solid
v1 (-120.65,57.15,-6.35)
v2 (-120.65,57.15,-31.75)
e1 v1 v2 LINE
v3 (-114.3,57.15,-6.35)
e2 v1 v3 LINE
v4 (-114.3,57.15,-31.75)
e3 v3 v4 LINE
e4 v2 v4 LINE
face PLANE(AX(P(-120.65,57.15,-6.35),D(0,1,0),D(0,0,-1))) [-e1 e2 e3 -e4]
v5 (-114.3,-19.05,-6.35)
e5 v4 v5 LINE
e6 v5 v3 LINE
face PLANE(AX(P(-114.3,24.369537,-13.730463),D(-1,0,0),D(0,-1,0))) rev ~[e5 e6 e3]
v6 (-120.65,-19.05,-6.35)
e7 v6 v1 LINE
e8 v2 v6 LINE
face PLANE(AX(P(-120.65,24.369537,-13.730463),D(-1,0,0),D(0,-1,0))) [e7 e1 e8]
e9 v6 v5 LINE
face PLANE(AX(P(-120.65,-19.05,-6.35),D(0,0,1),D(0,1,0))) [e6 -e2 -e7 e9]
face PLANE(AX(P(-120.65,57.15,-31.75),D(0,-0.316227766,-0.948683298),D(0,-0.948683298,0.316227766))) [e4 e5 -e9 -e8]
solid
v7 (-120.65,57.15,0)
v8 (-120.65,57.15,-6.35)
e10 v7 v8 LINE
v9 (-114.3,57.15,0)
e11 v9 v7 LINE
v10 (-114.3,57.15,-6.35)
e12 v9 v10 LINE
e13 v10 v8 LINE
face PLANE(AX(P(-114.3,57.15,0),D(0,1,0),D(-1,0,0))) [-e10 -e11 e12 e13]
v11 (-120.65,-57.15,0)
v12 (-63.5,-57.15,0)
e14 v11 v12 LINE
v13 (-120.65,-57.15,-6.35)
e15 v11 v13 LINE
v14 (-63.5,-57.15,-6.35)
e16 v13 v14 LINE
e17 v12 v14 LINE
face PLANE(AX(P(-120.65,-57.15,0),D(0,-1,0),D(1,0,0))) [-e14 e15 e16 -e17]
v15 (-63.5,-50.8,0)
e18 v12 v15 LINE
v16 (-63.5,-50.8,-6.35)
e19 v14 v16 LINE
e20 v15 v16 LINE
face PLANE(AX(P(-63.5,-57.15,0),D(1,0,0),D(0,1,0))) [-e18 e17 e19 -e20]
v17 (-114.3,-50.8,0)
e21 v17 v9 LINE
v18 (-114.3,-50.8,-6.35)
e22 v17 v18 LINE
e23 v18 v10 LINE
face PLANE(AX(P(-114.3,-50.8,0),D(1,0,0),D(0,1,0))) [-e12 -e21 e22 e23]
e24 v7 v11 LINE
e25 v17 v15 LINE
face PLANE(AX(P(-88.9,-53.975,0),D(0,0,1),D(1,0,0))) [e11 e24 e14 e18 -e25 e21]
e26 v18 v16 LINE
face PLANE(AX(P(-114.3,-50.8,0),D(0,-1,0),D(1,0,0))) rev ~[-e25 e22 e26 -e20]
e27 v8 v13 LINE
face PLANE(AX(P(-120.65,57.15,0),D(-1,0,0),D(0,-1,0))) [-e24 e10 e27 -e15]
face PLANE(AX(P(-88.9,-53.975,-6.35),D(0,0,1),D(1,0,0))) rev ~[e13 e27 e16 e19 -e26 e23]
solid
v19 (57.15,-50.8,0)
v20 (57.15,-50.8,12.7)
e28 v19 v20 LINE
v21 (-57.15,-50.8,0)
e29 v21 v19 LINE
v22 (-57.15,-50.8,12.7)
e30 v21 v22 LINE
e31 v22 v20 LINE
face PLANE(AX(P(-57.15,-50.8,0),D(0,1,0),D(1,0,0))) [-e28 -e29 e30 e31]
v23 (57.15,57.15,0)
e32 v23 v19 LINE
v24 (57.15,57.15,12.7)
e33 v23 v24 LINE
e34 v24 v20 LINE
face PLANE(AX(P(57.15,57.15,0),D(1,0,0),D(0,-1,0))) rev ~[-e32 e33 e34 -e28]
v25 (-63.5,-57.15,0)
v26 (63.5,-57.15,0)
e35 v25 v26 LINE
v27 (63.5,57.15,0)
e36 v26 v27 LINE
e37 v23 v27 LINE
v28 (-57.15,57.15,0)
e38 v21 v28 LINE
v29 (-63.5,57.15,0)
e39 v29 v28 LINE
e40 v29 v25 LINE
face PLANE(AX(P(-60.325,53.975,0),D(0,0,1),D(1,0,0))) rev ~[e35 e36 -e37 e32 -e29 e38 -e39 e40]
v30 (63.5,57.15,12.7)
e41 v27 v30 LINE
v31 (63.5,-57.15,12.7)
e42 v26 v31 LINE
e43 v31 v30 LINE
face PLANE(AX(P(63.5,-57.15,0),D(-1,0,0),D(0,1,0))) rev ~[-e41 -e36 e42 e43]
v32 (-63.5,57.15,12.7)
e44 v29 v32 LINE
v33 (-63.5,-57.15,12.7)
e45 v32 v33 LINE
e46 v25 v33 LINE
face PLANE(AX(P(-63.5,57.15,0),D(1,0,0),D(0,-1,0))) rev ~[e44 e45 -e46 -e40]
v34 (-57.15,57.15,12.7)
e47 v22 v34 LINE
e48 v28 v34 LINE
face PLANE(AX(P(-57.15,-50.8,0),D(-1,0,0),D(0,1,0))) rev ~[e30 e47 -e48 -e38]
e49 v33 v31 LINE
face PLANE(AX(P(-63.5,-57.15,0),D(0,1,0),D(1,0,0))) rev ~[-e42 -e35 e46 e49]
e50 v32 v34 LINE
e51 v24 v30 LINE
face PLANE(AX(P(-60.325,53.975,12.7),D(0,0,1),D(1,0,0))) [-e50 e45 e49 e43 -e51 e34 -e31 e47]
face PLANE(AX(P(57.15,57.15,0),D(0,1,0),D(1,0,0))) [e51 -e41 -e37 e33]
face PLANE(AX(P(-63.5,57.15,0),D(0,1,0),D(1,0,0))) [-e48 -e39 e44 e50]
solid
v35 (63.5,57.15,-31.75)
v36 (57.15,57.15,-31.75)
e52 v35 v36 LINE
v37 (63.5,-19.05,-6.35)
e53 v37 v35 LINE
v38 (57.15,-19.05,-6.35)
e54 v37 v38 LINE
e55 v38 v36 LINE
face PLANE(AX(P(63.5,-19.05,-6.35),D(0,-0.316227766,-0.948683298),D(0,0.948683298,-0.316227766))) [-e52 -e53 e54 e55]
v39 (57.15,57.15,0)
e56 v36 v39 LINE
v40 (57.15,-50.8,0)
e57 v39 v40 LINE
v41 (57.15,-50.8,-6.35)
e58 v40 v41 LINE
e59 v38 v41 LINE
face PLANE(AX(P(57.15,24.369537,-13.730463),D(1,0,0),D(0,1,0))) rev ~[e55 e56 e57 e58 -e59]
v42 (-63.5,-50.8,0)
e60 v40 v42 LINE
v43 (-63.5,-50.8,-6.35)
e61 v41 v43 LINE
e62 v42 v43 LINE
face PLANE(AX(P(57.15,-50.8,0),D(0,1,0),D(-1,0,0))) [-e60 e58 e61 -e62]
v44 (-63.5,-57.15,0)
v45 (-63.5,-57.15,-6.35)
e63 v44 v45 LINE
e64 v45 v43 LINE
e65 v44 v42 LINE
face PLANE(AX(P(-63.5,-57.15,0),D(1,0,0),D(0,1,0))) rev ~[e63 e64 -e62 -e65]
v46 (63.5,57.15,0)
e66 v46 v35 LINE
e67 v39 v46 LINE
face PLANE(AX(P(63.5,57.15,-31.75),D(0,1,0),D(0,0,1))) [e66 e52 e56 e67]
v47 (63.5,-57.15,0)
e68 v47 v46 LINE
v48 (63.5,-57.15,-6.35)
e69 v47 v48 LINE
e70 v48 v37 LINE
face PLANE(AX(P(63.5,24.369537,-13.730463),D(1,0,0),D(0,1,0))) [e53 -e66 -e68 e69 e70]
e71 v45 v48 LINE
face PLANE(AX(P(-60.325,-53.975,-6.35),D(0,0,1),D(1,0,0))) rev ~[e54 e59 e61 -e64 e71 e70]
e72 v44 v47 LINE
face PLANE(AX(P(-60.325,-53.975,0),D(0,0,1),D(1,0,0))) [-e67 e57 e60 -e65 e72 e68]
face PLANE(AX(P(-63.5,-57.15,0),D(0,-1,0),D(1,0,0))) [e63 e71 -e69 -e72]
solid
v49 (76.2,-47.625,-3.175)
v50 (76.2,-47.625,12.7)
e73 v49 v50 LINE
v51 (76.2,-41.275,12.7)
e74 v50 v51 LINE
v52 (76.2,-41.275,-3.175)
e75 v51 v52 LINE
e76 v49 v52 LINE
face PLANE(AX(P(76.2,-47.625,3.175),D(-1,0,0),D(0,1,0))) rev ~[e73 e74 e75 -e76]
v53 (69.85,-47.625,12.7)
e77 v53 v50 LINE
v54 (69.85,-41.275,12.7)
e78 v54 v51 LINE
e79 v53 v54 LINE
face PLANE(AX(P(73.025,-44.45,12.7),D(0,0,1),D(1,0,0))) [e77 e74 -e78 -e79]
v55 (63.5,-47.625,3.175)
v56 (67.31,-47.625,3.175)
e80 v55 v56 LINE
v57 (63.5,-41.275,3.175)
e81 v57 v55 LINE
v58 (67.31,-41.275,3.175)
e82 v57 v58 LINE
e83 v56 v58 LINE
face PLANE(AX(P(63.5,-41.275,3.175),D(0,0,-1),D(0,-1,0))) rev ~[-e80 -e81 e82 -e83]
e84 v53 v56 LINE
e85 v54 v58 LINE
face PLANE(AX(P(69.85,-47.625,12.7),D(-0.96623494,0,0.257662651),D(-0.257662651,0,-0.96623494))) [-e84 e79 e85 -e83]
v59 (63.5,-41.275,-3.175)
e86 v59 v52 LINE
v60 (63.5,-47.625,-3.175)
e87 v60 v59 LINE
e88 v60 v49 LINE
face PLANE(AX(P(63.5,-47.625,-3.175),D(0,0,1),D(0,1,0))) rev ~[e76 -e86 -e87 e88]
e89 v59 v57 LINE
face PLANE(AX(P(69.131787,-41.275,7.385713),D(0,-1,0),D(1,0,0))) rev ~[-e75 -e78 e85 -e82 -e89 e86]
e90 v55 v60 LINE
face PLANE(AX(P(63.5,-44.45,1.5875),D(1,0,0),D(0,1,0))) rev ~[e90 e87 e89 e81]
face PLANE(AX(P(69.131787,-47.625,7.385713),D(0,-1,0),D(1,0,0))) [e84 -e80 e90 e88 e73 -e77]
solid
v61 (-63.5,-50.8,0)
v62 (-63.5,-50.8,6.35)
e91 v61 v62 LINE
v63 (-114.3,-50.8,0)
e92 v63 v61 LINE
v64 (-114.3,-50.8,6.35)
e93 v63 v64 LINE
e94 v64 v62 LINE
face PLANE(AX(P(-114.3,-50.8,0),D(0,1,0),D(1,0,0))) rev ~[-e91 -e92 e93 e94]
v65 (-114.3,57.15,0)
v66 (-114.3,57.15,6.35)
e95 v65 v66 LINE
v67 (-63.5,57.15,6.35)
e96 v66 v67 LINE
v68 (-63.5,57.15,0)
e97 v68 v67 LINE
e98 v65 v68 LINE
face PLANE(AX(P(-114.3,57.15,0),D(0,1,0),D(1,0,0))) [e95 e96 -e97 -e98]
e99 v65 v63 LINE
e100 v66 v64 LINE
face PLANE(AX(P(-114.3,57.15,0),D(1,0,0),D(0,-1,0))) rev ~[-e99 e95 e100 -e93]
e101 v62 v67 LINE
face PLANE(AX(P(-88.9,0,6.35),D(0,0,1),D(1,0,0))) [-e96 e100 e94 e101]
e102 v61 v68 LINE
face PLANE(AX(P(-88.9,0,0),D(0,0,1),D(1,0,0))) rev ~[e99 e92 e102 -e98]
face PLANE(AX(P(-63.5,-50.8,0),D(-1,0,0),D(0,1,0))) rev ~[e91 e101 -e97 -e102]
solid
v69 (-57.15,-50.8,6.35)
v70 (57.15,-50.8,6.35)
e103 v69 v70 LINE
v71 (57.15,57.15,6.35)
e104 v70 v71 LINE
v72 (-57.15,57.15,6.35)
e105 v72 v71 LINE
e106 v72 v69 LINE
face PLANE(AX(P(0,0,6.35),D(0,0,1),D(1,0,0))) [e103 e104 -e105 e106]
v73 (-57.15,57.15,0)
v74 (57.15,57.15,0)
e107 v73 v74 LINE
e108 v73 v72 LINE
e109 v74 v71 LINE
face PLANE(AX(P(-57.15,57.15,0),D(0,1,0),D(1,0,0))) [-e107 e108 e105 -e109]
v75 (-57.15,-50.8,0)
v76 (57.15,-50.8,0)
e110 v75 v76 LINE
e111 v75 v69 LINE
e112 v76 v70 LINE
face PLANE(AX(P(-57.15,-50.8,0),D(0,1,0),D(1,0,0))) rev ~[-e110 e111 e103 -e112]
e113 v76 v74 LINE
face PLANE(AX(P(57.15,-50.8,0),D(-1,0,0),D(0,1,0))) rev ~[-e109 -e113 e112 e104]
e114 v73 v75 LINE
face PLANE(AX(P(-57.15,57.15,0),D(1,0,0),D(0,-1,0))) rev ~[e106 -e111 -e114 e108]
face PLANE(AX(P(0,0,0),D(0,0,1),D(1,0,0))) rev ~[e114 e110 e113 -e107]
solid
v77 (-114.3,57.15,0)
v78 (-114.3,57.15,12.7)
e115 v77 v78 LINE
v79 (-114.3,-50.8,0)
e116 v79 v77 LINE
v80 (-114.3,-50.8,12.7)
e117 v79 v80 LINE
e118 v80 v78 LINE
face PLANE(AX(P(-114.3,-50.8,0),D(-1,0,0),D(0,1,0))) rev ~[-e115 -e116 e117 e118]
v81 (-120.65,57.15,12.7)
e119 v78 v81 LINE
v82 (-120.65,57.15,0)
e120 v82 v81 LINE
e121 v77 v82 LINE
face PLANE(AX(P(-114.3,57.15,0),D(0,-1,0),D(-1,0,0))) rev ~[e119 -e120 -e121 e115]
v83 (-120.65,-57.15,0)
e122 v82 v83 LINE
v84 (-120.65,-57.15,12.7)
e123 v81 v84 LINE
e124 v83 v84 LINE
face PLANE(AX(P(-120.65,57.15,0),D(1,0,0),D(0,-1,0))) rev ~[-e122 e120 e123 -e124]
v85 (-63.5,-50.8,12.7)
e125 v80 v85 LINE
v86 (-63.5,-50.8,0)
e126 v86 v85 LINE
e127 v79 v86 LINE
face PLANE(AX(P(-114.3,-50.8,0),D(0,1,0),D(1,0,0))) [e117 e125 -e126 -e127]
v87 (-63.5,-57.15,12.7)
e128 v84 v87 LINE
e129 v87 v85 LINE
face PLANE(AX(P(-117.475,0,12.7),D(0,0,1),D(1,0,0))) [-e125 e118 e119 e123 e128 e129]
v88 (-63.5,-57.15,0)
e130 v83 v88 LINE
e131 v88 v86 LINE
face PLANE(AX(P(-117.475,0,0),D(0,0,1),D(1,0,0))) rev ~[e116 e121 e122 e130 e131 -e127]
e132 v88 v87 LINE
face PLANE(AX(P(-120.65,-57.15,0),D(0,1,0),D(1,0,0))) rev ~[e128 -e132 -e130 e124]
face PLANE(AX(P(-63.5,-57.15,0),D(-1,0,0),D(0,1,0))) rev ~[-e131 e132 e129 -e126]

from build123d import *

# Parameters (mm, degrees)
F0_W      = 50.8
F0_H      = 101.6
F0_H_2    = 6.35
F1_DEPTH  = 6.35
F0_W_2    = 114.3
F0_W_3    = 6.35
F2_DEPTH  = 12.7
F3_DEPTH  = 12.7
F4_DEPTH  = 6.35
F5_DEPTH  = 6.35
F7_DEPTH  = 6.35
F9_DEPTH  = 6.35
F11_DEPTH = 12.7
F12_W     = 6.35
F12_H     = 6.35
F13_DEPTH = 9.525
F15_DEPTH = 6.35


# Not quite as in the source:
# - a feature names something its author has since deleted; it is built from what else it names


with BuildPart() as f1:
    # F0 (on Top) → F1 (new body)
    with BuildSketch(Plane.XY):
        with Locations((-88.9, 0)):
            Rectangle(F0_W, F0_H)
        with Locations((-88.9, 53.975)):
            Rectangle(F0_W, F0_H_2)
    extrude(amount=F1_DEPTH)


with BuildPart() as f1b:
    # F0 (on Top) → F1, piece 2 (new body)
    with BuildSketch(Plane.XY):
        Rectangle(F0_W_2, F0_H)
        with Locations((0, 53.975)):
            Rectangle(F0_W_2, F0_H_2)
    extrude(amount=F1_DEPTH)


with BuildPart() as f2:
    # F0 (on Top) → F2 (new body)
    with BuildSketch(Plane.XY):
        with Locations((-60.325, 53.975)):
            Rectangle(F0_W_3, F0_H_2)
        with Locations((-60.325, 0)):
            Rectangle(F0_W_3, F0_H)
        with Locations((-60.325, -53.975)):
            Rectangle(F0_W_3, F0_H_2)
        with Locations((0, -53.975)):
            Rectangle(F0_W_2, F0_H_2)
        with Locations((60.325, 0)):
            Rectangle(F0_W_3, F0_H)
        with Locations((60.325, 53.975)):
            Rectangle(F0_W_3, F0_H_2)
        with Locations((60.325, -53.975)):
            Rectangle(F0_W_3, F0_H_2)
    extrude(amount=F2_DEPTH)


with BuildPart() as f3:
    # F0 (on Top) → F3 (new body)
    with BuildSketch(Plane.XY):
        Polygon((-114.3, 50.8), (-114.3, 57.15), (-120.65, 57.15), (-120.65, -57.15), (-114.3, -57.15), (-114.3, -50.8), align=None)
        with Locations((-88.9, -53.975)):
            Rectangle(F0_W, F0_H_2)
    extrude(amount=F3_DEPTH)


with BuildPart() as f4:
    # F0 (on Top) → F4 (new body)
    with BuildSketch(Plane.XY):
        with Locations((-60.325, -53.975)):
            Rectangle(F0_W_3, F0_H_2)
        with Locations((0, -53.975)):
            Rectangle(F0_W_2, F0_H_2)
        with Locations((60.325, -53.975)):
            Rectangle(F0_W_3, F0_H_2)
        with Locations((60.325, 0)):
            Rectangle(F0_W_3, F0_H)
        with Locations((60.325, 53.975)):
            Rectangle(F0_W_3, F0_H_2)
    extrude(amount=-F4_DEPTH)

    # F6 (on face) → F7 (join)
    with BuildSketch(Plane.YZ.offset(63.5)):
        Polygon((57.15, -31.75), (57.15, -6.35), (-19.05, -6.35), align=None)
    extrude(amount=-F7_DEPTH)


with BuildPart() as f5:
    # F0 (on Top) → F5 (new body)
    with BuildSketch(Plane.XY):
        with Locations((-88.9, -53.975)):
            Rectangle(F0_W, F0_H_2)
        Polygon((-114.3, 50.8), (-114.3, 57.15), (-120.65, 57.15), (-120.65, -57.15), (-114.3, -57.15), (-114.3, -50.8), align=None)
    extrude(amount=-F5_DEPTH)


with BuildPart() as f9:
    # F8 (on face) → F9 (new body)
    with BuildSketch(Plane(origin=(-120.65, 0, 0), x_dir=(0, -1, 0), z_dir=(-1, 0, 0))):
        Polygon((19.05, -6.35), (-57.15, -6.35), (-57.15, -31.75), align=None)
    extrude(amount=-F9_DEPTH)


with BuildPart() as f11:
    # F10 (on face) → F11 (new body)
    with BuildSketch(Plane.YZ.offset(63.5)):
        Polygon((-47.625, 3.175), (-47.625, 0), (-44.45, 0), (-41.275, 0), (-41.275, 3.175), align=None)
        Polygon((-44.45, 0), (-47.625, 0), (-47.625, -3.175), (-41.275, -3.175), (-41.275, 0), align=None)
    extrude(amount=F11_DEPTH)

    # F12 (on face) → F13 (join)
    with BuildSketch(Plane.XY.offset(3.175)):
        with Locations((73.025, -44.45)):
            Rectangle(F12_W, F12_H)
    extrude(amount=F13_DEPTH)

    # F14 (on face) → F15 (join)
    with BuildSketch(Plane.XZ.offset(47.625)):
        Polygon((67.31, 3.175), (69.85, 3.175), (69.85, 12.7), align=None)
    extrude(amount=-F15_DEPTH)


solid = Compound([f1.part, f1b.part, f2.part, f3.part, f4.part, f5.part, f9.part, f11.part])
